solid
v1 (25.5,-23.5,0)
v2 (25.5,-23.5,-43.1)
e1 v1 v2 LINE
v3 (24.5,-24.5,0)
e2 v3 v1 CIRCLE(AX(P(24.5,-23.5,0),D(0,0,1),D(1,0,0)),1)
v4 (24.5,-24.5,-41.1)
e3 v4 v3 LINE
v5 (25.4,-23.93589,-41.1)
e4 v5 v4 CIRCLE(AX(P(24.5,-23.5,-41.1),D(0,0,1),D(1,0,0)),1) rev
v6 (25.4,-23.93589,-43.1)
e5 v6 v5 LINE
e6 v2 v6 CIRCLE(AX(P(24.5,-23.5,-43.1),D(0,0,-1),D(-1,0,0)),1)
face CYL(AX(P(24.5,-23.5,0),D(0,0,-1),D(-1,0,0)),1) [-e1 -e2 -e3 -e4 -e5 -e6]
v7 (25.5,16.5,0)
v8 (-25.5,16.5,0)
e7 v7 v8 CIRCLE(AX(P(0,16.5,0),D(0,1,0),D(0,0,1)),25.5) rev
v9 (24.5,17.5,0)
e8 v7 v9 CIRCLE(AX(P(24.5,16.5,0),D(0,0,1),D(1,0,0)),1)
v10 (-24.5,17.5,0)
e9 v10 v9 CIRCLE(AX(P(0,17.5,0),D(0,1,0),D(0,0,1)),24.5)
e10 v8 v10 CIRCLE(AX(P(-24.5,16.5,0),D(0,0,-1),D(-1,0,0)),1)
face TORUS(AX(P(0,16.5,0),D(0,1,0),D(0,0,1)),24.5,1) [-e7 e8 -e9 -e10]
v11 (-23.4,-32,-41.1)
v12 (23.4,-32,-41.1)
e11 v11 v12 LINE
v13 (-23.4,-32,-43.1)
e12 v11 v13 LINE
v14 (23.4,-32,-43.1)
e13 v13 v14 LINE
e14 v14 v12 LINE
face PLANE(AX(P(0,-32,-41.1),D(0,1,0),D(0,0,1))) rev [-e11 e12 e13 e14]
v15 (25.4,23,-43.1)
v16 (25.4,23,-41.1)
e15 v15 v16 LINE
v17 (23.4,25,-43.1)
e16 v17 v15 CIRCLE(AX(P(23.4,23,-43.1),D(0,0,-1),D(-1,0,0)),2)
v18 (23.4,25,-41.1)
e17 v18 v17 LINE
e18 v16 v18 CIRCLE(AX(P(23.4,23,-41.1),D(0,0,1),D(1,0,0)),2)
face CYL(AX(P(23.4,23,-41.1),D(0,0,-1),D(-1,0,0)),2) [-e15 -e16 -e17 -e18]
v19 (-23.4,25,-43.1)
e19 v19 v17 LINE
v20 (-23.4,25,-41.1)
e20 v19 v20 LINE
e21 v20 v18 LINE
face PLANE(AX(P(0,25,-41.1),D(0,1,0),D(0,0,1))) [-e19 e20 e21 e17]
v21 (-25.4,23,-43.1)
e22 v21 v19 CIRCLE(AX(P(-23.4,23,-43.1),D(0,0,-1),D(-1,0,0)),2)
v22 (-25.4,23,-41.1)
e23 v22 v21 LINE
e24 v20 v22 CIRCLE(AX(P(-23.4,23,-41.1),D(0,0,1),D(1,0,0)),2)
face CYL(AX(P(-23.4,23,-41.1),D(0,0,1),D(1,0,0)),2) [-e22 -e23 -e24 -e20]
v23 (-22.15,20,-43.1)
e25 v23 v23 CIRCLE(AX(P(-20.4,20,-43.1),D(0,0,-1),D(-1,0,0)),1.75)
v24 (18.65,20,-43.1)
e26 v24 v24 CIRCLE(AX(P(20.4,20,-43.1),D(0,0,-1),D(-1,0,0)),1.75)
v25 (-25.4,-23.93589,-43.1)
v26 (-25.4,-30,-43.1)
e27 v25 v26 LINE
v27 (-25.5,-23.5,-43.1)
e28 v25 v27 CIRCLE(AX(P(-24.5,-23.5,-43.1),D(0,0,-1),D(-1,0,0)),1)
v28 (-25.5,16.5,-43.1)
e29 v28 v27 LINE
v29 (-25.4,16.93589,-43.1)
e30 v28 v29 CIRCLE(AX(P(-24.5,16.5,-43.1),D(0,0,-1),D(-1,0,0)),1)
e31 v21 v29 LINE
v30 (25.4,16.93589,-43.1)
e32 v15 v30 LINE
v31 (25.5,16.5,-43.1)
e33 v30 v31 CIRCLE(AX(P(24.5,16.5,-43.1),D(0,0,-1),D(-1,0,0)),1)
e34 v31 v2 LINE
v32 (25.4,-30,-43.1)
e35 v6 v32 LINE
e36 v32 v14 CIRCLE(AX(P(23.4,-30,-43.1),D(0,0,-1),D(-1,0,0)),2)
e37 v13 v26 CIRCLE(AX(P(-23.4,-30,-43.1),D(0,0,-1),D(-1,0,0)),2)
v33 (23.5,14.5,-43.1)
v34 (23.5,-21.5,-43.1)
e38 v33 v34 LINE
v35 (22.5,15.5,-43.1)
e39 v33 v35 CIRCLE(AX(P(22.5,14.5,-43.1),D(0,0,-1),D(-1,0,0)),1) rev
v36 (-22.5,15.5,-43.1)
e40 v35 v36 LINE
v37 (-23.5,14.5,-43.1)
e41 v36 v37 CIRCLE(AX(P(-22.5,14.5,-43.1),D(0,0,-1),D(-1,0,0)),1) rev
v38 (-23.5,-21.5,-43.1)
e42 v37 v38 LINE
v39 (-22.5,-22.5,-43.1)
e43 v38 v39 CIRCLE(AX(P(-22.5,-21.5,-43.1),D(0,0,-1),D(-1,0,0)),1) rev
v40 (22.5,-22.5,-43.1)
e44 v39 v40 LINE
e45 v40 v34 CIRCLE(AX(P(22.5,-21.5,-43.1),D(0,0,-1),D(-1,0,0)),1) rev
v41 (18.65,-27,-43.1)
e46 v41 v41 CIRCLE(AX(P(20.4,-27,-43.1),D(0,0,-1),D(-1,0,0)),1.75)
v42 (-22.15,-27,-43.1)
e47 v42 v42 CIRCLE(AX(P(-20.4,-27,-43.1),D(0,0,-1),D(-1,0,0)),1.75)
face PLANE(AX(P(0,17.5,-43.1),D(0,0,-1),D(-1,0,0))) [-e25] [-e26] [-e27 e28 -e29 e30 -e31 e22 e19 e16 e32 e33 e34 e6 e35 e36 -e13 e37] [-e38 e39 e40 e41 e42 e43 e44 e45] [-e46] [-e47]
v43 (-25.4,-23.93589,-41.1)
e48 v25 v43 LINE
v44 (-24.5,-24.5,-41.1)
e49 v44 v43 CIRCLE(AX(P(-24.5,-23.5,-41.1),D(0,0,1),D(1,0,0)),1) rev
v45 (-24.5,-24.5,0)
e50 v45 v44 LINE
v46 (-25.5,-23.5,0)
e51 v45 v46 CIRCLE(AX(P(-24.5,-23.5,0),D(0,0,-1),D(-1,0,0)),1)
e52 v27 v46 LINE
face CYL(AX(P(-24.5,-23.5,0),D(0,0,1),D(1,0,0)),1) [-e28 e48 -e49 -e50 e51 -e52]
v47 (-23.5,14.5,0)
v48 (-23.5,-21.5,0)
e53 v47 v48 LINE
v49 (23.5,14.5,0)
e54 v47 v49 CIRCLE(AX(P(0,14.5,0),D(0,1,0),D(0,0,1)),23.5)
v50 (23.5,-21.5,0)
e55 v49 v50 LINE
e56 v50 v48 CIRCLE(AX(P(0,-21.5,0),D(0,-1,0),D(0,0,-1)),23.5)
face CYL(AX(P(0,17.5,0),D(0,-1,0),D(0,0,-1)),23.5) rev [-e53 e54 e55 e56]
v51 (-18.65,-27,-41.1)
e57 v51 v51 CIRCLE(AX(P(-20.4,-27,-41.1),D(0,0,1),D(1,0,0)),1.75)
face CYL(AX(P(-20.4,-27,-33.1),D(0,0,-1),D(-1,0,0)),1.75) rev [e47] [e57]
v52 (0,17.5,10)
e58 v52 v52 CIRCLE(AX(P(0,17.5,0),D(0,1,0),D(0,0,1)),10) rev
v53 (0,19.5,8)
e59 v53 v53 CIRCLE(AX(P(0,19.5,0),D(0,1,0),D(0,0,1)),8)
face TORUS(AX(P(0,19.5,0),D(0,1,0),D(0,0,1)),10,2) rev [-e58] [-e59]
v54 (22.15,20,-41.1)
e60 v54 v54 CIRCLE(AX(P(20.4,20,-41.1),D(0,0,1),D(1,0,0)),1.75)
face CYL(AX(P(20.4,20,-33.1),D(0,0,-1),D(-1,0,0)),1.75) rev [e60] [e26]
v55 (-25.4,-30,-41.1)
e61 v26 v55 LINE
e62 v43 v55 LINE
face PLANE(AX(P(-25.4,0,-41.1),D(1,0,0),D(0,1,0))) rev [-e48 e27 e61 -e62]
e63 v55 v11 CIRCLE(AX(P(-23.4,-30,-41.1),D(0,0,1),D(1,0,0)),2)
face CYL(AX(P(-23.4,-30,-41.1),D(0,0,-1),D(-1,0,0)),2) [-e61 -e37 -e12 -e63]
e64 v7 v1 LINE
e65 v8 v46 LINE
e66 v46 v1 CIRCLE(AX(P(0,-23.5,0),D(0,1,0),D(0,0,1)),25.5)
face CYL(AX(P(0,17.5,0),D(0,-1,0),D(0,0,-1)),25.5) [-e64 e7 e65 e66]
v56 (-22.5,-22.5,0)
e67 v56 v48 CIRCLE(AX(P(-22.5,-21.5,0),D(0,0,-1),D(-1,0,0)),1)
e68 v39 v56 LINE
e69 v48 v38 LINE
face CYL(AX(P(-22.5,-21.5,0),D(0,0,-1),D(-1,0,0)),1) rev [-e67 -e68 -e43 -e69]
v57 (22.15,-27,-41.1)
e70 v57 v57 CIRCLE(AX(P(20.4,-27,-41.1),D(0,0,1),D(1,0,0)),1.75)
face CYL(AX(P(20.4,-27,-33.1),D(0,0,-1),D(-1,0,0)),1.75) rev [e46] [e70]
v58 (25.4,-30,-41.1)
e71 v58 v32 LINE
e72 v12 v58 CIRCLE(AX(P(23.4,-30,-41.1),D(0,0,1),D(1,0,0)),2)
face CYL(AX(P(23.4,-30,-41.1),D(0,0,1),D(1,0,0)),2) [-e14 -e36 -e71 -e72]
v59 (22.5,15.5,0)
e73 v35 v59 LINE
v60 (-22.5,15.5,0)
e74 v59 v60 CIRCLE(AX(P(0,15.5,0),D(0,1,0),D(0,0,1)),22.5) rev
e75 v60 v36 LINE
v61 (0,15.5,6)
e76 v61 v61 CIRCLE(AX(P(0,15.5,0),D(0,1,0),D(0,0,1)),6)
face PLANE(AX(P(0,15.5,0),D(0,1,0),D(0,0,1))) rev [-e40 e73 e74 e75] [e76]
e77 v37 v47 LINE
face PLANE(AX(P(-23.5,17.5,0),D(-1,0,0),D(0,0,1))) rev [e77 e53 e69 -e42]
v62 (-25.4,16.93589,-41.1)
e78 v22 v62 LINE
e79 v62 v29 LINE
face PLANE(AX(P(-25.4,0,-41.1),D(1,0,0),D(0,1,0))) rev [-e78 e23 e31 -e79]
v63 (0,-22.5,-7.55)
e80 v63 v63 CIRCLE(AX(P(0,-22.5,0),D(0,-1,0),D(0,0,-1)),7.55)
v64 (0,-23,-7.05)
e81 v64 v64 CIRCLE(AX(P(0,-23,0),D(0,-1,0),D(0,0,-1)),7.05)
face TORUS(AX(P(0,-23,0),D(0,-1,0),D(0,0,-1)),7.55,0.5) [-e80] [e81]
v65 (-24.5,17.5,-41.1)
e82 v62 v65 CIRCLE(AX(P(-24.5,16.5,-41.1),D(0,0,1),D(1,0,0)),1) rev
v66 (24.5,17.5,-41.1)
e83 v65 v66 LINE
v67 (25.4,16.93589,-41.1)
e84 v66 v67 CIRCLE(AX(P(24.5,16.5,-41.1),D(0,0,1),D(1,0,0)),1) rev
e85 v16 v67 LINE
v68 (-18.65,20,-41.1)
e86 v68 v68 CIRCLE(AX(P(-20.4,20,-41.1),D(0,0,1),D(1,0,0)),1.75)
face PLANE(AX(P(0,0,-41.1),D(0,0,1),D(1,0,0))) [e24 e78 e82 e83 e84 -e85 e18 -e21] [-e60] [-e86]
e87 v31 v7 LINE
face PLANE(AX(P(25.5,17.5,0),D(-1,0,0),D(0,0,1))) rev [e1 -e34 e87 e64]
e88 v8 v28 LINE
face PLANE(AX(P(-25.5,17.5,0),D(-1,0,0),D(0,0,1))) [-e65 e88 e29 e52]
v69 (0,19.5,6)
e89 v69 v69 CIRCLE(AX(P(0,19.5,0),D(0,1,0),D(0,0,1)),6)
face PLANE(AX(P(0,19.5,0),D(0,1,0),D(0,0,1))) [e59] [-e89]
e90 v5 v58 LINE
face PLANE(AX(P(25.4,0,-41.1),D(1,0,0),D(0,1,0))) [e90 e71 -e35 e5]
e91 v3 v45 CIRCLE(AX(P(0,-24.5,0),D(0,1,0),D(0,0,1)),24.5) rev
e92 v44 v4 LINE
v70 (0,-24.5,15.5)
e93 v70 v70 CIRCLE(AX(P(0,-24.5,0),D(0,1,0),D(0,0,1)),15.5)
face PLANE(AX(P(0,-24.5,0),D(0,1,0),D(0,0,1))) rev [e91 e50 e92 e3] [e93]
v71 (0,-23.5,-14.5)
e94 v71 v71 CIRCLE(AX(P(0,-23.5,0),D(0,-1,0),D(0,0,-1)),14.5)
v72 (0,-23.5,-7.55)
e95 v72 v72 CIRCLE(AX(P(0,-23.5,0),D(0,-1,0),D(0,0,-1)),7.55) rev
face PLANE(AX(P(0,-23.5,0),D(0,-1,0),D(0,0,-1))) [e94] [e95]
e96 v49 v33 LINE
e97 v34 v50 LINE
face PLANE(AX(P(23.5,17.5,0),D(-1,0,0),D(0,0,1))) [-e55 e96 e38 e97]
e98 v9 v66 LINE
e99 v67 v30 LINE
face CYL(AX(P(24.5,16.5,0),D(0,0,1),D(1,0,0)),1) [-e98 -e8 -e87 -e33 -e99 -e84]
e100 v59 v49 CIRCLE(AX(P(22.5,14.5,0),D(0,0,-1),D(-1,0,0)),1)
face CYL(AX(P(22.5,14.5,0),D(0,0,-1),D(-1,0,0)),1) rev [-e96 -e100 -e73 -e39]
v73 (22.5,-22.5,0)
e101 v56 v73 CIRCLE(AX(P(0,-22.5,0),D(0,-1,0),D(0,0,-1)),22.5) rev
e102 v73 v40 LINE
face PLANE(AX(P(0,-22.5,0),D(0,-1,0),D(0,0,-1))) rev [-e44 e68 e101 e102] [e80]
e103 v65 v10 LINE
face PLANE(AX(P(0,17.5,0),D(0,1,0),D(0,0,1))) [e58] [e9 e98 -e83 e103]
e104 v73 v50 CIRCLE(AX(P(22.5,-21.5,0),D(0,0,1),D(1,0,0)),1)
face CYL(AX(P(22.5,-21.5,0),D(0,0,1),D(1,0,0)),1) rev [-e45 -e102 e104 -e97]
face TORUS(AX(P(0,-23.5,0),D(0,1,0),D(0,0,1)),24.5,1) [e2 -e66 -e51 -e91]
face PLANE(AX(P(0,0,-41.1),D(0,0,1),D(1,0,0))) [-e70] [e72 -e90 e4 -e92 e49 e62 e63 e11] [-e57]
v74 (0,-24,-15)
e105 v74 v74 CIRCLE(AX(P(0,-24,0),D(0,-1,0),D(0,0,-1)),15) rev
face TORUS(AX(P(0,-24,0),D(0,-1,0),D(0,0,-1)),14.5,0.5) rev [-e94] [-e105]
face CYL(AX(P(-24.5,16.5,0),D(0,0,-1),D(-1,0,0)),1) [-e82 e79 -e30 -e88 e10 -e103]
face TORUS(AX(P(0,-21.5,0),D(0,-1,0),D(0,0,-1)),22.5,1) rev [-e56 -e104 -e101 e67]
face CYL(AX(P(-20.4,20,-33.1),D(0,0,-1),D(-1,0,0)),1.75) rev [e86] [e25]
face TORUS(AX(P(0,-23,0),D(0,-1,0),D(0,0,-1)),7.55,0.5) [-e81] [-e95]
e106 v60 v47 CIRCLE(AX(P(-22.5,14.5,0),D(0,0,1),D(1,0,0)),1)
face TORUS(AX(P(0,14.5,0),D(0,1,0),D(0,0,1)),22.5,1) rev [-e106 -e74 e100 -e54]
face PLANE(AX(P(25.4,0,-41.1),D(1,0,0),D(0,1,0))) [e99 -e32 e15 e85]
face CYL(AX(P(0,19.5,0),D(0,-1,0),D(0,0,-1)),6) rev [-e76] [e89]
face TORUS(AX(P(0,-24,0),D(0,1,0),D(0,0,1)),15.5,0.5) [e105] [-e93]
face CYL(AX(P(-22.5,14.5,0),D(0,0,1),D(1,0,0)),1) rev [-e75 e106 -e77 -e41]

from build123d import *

# Parameters (mm, degrees)
BOSS_EXTRUDE1_DEPTH      = 21
BOSS_EXTRUDE1_DEPTH_BACK = 21
BOSS_EXTRUDE2_START      = -2
BOSS_EXTRUDE2_DEPTH      = 2
BOSS_EXTRUDE3_DEPTH      = 2
FILLET1_R                = 1
SKETCH12_R               = 8
SKETCH12_R_2             = 6
BOSS_EXTRUDE4_DEPTH      = 2
CUT_EXTRUDE1_START       = -11
SKETCH14_R               = 6
CUT_EXTRUDE1_DEPTH       = 11
FILLET2_R                = 2
SKETCH15_W               = 50.8
SKETCH15_H               = 57
BOSS_EXTRUDE5_DEPTH      = 2
FILLET3_R                = 2
SKETCH16_R               = 15
SKETCH16_R_2             = 7.05
CUT_EXTRUDE2_DEPTH       = 1
SKETCH16_3_R             = 7.05
CUT_EXTRUDE3_DEPTH       = 3
FILLET4_R                = 0.5
SKETCH17_R               = 1.75
CUT_EXTRUDE4_DEPTH       = 10


with BuildPart() as part:
    # Sketch7 → Boss-Extrude1 (new, two sides: drawn at the far end of the back side and taken through both)
    with BuildSketch(Plane(origin=(0, -3.5, 0), x_dir=(1, 0, 0), z_dir=(0, 1, 0)).offset(-BOSS_EXTRUDE1_DEPTH_BACK)):
        with BuildLine():
            Line((-23.5, 43.1), (-25.4, 43.1))
            Line((-25.4, 43.1), (-25.5, 43.1))
            Line((-25.5, 43.1), (-25.5, 0))
            ThreePointArc((-25.5, 0), (0, -25.5), (25.5, 0))
            Line((25.5, 0), (25.5, 43.1))
            Line((25.5, 43.1), (25.4, 43.1))
            Line((25.4, 43.1), (23.5, 43.1))
            Line((23.5, 43.1), (23.5, 0))
            ThreePointArc((23.5, 0), (0, -23.5), (-23.5, 0))
            Line((-23.5, 0), (-23.5, 43.1))
        make_face()
    extrude(amount=BOSS_EXTRUDE1_DEPTH + BOSS_EXTRUDE1_DEPTH_BACK)

    # Sketch8 → Boss-Extrude2 (add)
    with BuildSketch(Plane(origin=(0, 17.5, 0), x_dir=(1, 0, 0), z_dir=(0, 1, 0)).offset(BOSS_EXTRUDE2_START)):
        with BuildLine():
            Line((-25.5, 0), (-25.5, 43.1))
            Line((-25.5, 43.1), (25.5, 43.1))
            Line((25.5, 43.1), (25.5, 0))
            ThreePointArc((25.5, 0), (0, -25.5), (-25.5, 0))
        make_face()
    extrude(amount=BOSS_EXTRUDE2_DEPTH)

    # Sketch10 → Boss-Extrude3 (add)
    with BuildSketch(Plane.XZ.offset(24.5)):
        with BuildLine():
            Line((-23.5, 0), (-23.5, -43.1))
            Line((-23.5, -43.1), (23.5, -43.1))
            Line((23.5, -43.1), (23.5, 0))
            ThreePointArc((23.5, 0), (0, 23.5), (-23.5, 0))
        make_face()
        with BuildLine():
            ThreePointArc((25.5, 0), (0, 25.5), (-25.5, 0))
            Line((-25.5, 0), (-25.5, -43.1))
            Line((-25.5, -43.1), (-23.5, -43.1))
            Line((-23.5, -43.1), (-23.5, 0))
            ThreePointArc((-23.5, 0), (0, 23.5), (23.5, 0))
            Line((23.5, 0), (23.5, -43.1))
            Line((23.5, -43.1), (25.5, -43.1))
            Line((25.5, -43.1), (25.5, 0))
        make_face()
    extrude(amount=-BOSS_EXTRUDE3_DEPTH)

    # Fillet1
    fillet1_edges = [part.edges().sort_by_distance(p)[0] for p in [
        (0, 17.5, 25.5),
        (25.5, 17.5, -21.55),
        (25.5, -24.5, -21.55),
        (0, -24.5, 25.5),
        (-25.5, -24.5, -21.55),
        (0, 15.5, 23.5),
        (23.5, 15.5, -21.55),
        (-23.5, 15.5, -21.55),
        (-25.5, 17.5, -21.55),
        (23.5, -22.5, -21.55),
        (0, -22.5, 23.5),
        (-23.5, -22.5, -21.55),
    ]]
    fillet(fillet1_edges, radius=FILLET1_R)

    # Sketch12 → Boss-Extrude4 (add)
    with BuildSketch(Plane(origin=(0, 17.5, 0), x_dir=(1, 0, 0), z_dir=(0, 1, 0))):
        with Locations(Location((0, 0, 0), (0, 0, 270))):
            Circle(SKETCH12_R)
        with Locations(Location((0, 0, 0), (0, 0, 270))):
            Circle(SKETCH12_R_2, mode=Mode.SUBTRACT)
    extrude(amount=BOSS_EXTRUDE4_DEPTH)

    # Sketch14 → Cut-Extrude1 (cut)
    with BuildSketch(Plane(origin=(0, 17.5, 0), x_dir=(1, 0, 0), z_dir=(0, 1, 0)).offset(CUT_EXTRUDE1_START)):
        with Locations(Location((0, 0, 0), (0, 0, 270))):
            Circle(SKETCH14_R)
    extrude(amount=CUT_EXTRUDE1_DEPTH, mode=Mode.SUBTRACT)

    # Fillet2
    fillet2_edges = [part.edges().sort_by_distance(p)[0] for p in [
        (0, 17.5, -8),
    ]]
    fillet(fillet2_edges, radius=FILLET2_R - 0.0001)  # a hair under: the kernel refuses the full size

    # Sketch15 → Boss-Extrude5 (add)
    with BuildSketch(Plane.XY.offset(-43.1)):
        with Locations((0, -3.5)):
            Rectangle(SKETCH15_W, SKETCH15_H)
        with BuildLine():
            ThreePointArc((22.5, 15.5), (23.207106781, 15.207106781), (23.5, 14.5))
            Line((23.5, 14.5), (23.5, -21.5))
            ThreePointArc((23.5, -21.5), (23.207106781, -22.207106781), (22.5, -22.5))
            Line((22.5, -22.5), (-22.5, -22.5))
            ThreePointArc((-22.5, -22.5), (-23.207106781, -22.207106781), (-23.5, -21.5))
            Line((-23.5, -21.5), (-23.5, 14.5))
            ThreePointArc((-23.5, 14.5), (-23.207106781, 15.207106781), (-22.5, 15.5))
            Line((-22.5, 15.5), (22.5, 15.5))
        make_face(mode=Mode.SUBTRACT)
    extrude(amount=BOSS_EXTRUDE5_DEPTH)

    # Fillet3
    fillet3_edges = [part.edges().sort_by_distance(p)[0] for p in [
        (25.4, -32, -42.1),
        (-25.4, 25, -42.1),
        (-25.4, -32, -42.1),
        (25.4, 25, -42.1),
    ]]
    fillet(fillet3_edges, radius=FILLET3_R)

    # Sketch16 → Cut-Extrude2 (cut)
    # profile 1 of 2: a face of its own
    with BuildSketch(Plane.XZ.offset(24.5)):
        with Locations(Location((0, 0, 0), (0, 0, 270))):
            Circle(SKETCH16_R)
        Circle(SKETCH16_R_2, mode=Mode.SUBTRACT)
    # profile 2 of 2: a face of its own
    with BuildSketch(Plane.XZ.offset(24.5)):
        Circle(SKETCH16_R_2)
    extrude(amount=-CUT_EXTRUDE2_DEPTH, mode=Mode.SUBTRACT)

    # Sketch16<3> → Cut-Extrude3 (cut)
    with BuildSketch(Plane.XZ.offset(24.5)):
        with Locations(Location((0, 0, 0), (0, 0, 270))):
            Circle(SKETCH16_3_R)
    extrude(amount=-CUT_EXTRUDE3_DEPTH, mode=Mode.SUBTRACT)

    # Fillet4
    fillet4_edges = [part.edges().sort_by_distance(p)[0] for p in [
        (0, -23.5, 15),
        (0, -24.5, 15),
        (0, -22.5, 7.05),
        (0, -23.5, 7.05),
    ]]
    fillet(fillet4_edges, radius=FILLET4_R - 0.0001)  # a hair under: the kernel refuses the full size

    # Sketch17 → Cut-Extrude4 (cut)
    with BuildSketch(Plane(origin=(0, 0, -43.1), x_dir=(-1, 0, 0), z_dir=(0, 0, -1))):
        with Locations((-20.4, 20)):
            Circle(SKETCH17_R)
        with Locations((-20.4, -27)):
            Circle(SKETCH17_R)
        with Locations((20.4, -27)):
            Circle(SKETCH17_R)
        with Locations((20.4, 20)):
            Circle(SKETCH17_R)
    extrude(amount=-CUT_EXTRUDE4_DEPTH, mode=Mode.SUBTRACT)


solid = part.part
